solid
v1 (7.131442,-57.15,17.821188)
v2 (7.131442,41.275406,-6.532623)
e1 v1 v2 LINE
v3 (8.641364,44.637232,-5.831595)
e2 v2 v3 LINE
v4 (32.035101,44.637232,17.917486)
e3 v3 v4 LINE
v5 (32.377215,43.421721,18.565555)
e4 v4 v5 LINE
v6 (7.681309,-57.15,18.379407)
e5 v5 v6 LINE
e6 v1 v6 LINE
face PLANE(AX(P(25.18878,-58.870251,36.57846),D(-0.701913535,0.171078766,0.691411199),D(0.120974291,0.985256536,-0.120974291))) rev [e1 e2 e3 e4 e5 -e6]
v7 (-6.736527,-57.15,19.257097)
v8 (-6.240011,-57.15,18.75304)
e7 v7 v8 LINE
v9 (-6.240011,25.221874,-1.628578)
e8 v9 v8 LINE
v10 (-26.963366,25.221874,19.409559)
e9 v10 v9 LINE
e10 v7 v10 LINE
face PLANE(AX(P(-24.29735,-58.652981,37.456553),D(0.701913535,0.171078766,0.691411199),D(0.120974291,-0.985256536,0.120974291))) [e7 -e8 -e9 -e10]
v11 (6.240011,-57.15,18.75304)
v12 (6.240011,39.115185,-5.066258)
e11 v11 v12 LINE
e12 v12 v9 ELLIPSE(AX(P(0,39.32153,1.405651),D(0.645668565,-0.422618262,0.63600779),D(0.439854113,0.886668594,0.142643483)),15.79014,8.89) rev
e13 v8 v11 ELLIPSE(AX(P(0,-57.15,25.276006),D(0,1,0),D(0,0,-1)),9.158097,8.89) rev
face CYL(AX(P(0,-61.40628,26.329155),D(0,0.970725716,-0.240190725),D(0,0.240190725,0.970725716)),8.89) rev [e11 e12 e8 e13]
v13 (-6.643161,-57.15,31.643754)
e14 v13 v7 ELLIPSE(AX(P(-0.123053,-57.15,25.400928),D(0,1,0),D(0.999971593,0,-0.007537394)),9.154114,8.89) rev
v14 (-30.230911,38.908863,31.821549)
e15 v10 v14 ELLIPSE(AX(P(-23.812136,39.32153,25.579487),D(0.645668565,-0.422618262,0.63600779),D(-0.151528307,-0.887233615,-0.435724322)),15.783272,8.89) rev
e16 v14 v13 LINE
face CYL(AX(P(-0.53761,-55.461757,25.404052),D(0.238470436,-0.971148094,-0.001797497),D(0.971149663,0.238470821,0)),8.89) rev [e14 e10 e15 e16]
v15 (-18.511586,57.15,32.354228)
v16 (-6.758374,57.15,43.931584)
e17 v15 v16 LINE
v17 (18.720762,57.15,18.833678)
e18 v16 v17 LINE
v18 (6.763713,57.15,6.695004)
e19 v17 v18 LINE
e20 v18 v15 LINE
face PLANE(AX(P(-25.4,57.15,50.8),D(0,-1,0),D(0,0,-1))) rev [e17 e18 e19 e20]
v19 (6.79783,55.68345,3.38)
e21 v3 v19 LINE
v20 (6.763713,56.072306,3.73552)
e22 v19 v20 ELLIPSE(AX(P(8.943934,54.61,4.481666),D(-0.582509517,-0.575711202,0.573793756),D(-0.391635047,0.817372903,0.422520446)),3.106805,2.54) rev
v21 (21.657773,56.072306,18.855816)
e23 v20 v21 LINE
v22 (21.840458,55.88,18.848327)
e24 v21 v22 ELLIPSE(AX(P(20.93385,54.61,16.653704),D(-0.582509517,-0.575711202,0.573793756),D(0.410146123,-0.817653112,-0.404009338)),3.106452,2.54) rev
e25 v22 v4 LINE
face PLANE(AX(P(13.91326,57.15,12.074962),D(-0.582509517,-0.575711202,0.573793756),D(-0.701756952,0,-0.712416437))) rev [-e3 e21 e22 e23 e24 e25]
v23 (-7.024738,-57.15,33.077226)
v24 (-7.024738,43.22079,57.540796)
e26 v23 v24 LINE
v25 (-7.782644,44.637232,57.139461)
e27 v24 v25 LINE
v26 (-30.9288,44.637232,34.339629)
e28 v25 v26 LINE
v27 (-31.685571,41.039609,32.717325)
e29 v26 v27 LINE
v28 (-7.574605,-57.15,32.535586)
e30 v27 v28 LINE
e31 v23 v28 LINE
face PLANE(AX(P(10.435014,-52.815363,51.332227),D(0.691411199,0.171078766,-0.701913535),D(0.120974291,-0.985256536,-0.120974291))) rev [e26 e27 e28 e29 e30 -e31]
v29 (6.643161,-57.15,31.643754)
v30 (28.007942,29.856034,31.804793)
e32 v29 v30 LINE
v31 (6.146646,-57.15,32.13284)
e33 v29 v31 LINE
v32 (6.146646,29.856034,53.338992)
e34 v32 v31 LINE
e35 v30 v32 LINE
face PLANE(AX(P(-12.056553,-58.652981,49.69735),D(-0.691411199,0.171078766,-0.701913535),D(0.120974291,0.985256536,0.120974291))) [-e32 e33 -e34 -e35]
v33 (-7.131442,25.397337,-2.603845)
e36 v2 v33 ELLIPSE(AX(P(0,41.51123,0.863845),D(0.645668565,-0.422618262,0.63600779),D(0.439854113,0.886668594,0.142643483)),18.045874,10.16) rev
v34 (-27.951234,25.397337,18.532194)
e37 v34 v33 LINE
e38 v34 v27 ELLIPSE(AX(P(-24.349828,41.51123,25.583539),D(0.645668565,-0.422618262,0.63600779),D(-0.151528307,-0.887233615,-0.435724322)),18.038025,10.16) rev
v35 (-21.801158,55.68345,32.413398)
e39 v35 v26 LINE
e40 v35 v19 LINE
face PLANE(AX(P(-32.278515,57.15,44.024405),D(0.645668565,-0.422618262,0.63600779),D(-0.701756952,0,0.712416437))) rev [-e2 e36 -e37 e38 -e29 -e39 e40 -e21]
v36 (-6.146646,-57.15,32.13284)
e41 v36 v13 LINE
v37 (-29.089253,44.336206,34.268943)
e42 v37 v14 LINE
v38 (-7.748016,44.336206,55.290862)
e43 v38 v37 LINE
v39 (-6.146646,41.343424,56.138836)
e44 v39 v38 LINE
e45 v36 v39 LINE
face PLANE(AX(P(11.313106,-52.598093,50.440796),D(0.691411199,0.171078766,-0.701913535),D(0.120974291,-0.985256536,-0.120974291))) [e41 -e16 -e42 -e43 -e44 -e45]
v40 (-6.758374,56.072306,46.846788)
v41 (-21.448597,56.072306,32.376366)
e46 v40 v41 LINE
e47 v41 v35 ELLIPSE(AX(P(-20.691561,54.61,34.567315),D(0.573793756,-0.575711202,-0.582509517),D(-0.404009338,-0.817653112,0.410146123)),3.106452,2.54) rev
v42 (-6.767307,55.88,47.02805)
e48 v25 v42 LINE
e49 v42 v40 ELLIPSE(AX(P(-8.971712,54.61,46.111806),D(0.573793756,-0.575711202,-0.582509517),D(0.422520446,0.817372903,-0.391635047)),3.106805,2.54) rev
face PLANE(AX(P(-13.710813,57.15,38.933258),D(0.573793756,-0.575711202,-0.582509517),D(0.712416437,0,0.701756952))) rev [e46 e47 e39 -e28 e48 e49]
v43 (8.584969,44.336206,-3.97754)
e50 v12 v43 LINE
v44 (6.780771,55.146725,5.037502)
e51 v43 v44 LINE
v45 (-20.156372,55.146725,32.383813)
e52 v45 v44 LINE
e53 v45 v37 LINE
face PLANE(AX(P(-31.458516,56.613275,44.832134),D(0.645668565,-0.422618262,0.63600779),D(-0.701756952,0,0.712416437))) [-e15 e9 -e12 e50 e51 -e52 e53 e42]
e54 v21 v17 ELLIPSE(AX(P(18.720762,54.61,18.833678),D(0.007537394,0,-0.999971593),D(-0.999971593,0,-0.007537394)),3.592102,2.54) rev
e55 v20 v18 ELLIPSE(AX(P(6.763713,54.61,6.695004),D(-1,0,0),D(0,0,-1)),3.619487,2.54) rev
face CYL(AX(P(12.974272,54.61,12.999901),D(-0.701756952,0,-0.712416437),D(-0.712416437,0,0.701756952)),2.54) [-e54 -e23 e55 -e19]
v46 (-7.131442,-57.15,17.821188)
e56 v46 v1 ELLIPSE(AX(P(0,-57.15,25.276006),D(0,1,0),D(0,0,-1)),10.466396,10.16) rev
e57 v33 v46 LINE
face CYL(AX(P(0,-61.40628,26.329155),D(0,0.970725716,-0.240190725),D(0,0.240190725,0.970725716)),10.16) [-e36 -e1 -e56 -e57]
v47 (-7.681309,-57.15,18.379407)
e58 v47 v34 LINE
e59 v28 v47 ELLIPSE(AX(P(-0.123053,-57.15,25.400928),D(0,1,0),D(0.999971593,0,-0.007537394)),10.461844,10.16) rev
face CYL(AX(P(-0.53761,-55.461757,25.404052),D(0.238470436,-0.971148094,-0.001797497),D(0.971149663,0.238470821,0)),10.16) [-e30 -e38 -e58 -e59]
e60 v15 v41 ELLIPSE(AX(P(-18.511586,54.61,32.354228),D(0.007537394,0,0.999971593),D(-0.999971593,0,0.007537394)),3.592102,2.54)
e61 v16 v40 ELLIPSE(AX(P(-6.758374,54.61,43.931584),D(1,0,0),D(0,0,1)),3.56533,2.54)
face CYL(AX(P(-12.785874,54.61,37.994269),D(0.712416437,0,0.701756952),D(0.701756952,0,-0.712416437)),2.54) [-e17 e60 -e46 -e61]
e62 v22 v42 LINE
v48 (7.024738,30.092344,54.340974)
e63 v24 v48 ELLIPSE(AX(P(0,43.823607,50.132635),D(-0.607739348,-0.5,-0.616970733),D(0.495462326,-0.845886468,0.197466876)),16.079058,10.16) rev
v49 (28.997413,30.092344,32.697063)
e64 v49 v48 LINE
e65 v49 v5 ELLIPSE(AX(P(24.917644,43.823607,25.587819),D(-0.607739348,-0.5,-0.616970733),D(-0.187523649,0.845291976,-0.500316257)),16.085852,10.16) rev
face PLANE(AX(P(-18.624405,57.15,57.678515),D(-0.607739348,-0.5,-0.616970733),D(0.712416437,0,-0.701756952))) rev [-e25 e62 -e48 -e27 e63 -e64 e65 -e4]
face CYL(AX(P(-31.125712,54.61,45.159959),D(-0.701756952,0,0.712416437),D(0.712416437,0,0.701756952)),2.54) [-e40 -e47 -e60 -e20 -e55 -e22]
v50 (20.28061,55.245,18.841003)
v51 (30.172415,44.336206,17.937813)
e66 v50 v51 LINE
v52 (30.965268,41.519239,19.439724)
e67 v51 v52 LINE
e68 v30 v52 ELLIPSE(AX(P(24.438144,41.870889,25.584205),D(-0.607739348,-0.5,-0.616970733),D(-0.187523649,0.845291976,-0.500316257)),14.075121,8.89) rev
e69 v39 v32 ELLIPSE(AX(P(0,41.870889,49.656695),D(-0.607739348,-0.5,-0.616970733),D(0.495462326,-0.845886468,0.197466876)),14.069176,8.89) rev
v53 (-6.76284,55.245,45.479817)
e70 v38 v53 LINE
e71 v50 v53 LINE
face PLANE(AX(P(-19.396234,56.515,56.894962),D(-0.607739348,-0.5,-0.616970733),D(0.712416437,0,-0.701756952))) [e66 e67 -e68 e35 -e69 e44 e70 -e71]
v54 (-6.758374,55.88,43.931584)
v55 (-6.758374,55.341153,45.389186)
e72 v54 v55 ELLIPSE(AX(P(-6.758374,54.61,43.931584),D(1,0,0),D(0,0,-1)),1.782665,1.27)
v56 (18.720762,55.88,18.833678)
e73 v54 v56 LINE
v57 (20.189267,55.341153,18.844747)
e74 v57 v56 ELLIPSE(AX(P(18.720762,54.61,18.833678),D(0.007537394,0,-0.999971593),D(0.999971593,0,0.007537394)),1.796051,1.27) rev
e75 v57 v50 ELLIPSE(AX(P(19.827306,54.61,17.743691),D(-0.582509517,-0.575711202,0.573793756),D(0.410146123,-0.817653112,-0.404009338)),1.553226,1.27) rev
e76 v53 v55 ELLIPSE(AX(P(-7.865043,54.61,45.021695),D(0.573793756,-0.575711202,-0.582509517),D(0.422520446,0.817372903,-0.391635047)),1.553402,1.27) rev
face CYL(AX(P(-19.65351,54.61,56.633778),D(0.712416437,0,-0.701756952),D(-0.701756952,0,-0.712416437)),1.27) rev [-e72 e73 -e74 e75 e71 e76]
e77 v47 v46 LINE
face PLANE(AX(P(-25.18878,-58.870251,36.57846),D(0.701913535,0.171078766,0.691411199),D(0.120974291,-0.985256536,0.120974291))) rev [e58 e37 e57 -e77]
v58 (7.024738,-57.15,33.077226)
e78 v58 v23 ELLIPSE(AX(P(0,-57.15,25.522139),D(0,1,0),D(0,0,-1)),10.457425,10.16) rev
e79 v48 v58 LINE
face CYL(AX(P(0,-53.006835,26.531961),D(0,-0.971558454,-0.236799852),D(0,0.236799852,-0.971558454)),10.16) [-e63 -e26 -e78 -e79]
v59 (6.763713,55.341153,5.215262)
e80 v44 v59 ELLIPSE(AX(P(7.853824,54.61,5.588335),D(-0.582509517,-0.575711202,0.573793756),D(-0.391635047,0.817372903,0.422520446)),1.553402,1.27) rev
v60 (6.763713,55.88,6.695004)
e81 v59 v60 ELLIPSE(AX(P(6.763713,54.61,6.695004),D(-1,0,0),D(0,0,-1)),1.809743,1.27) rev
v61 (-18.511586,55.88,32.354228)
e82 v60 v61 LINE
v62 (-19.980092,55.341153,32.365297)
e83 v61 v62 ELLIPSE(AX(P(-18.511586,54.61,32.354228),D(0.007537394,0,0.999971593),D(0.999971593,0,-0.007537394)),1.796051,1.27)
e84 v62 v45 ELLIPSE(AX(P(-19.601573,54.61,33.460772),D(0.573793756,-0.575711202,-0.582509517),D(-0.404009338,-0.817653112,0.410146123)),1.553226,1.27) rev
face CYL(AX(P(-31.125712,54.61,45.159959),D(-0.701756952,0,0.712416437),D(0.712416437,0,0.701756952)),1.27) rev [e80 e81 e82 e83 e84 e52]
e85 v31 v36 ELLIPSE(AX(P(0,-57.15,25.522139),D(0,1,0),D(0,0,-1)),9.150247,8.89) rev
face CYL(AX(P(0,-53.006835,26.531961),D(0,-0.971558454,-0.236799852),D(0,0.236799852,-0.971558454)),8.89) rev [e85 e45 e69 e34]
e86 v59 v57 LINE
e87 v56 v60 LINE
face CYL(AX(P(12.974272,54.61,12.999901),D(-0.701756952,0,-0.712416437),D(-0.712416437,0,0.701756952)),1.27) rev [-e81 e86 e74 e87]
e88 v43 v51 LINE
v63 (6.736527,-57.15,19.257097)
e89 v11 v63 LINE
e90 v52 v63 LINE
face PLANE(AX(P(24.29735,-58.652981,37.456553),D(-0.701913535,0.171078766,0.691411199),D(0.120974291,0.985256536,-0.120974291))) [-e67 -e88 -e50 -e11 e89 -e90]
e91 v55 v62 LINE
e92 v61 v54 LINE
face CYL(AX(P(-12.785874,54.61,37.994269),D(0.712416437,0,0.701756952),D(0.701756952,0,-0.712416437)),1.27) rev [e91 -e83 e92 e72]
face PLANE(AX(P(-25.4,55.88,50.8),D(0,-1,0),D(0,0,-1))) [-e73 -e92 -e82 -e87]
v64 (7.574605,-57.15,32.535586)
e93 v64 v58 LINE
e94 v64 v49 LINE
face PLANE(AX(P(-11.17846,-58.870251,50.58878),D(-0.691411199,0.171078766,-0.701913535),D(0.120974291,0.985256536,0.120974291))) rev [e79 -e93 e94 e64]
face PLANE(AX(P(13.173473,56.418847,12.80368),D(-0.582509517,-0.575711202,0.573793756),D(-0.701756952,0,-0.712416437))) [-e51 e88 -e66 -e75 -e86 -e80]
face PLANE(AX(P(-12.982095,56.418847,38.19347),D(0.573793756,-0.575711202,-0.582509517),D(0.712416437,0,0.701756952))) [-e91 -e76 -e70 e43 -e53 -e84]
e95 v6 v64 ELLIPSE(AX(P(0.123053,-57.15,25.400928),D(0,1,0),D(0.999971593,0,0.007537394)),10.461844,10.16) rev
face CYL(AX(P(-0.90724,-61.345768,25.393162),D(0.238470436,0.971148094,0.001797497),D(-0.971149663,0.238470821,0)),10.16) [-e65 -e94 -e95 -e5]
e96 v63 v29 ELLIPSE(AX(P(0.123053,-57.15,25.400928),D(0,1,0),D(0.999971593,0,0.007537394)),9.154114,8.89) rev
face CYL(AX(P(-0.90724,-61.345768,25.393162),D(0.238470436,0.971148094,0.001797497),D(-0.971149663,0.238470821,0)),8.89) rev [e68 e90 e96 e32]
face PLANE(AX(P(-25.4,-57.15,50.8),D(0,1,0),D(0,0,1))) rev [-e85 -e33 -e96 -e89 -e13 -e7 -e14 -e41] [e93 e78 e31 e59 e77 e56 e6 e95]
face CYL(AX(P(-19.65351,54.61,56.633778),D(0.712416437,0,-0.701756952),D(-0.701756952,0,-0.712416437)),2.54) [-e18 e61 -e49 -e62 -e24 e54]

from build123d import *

# Parameters (mm, degrees)
SKETCH3_W           = 50.8
SKETCH3_H           = 114.3
BOSS_EXTRUDE5_DEPTH = 50.8
DRAFT2_ANGLE        = 7
CHAMFER22_SIZE      = 35.56
CHAMFER22_SIZE_2    = 36.100146123
CHAMFER26_SIZE      = 12.7
CHAMFER26_SIZE_2    = 10.982965741
CHAMFER27_SIZE      = 27.462526176
CHAMFER27_SIZE_2    = 20.32
CHAMFER28_SIZE      = 32.227786218
CHAMFER28_SIZE_2    = 20.32
FILLET36_R          = 2.54
FILLET41_R          = 10.16
SHELL2_T            = -1.27


with BuildPart() as part:
    # Sketch3 → Boss-Extrude5 (new body)
    with BuildSketch(Plane.XY):
        Rectangle(SKETCH3_W, SKETCH3_H)
    extrude(amount=BOSS_EXTRUDE5_DEPTH)

    # Draft2
    draft2_faces = [part.faces().sort_by_distance(p)[0] for p in [
        (0, 0, 50.8),
        (25.4, 0, 25.4),
        (0, 0, 0),
        (-25.4, 0, 25.4),
    ]]
    draft(draft2_faces, Plane(origin=(-25.4, -57.15, 50.8), x_dir=(0, 0, -1), z_dir=(0, -1, 0)), DRAFT2_ANGLE)

    # Chamfer22
    # the kernel refuses this chamfer: 36.100146123, 35.56 mm, written as the material it takes off along each edge
    with BuildSketch(Plane(origin=(14.164548215, -148.655411614, 39.564548215), x_dir=(0.04243090311992196, 0.11662547522410431, -0.9922691756721962), z_dir=(0.1209742911513545, 0.9852565360152932, 0.1209742911513545)), Plane(origin=(-50.669727097, 148.655411614, 76.069727097), x_dir=(-0.04243090311992182, 0.11662547522410434, -0.9922691756721962), z_dir=(0.1209742911513545, -0.9852565360152932, -0.1209742911513545))) as chamfer22_piece_1:
        Polygon((CHAMFER22_SIZE * 0.999610675702, CHAMFER22_SIZE * 0.0279015595125), (-CHAMFER22_SIZE_2 * 0.0427448365612, CHAMFER22_SIZE_2 * 0.999086021807), (0, 0), align=None)
    extrude(amount=301.759808092, mode=Mode.SUBTRACT)
    with BuildSketch(Plane(origin=(14.164548215, -148.655411614, 11.235451785), x_dir=(0.04160965436003197, 0.11672908614577471, 0.9922917701521116), z_dir=(0.1209742911513545, 0.9852565360152932, -0.1209742911513545)), Plane(origin=(-50.669727097, 148.655411614, -25.269727097), x_dir=(-0.04160965436003206, 0.11672908614577471, 0.9922917701521116), z_dir=(0.1209742911513545, -0.9852565360152932, 0.1209742911513545))) as chamfer22_piece_2:
        Polygon((CHAMFER22_SIZE_2 * 0.999633437363, -CHAMFER22_SIZE_2 * 0.0270738052216), (-CHAMFER22_SIZE * 0.0419175116292, -CHAMFER22_SIZE * 0.999121074855), (0, 0), align=None)
    extrude(amount=301.759808092, mode=Mode.SUBTRACT)

    # Chamfer26
    # the kernel refuses this chamfer: 12.7, 10.982965741 mm, written as the material it takes off along each edge
    with BuildSketch(Plane(origin=(62.353919786, 57.15, 45.600752144), x_dir=(-0.10253351623411874, -0.9895888066791988, 0.10099936506685082), z_dir=(-0.7017569520656596, 0, -0.7124164373647731))) as chamfer26_piece_1:
        Polygon((CHAMFER26_SIZE * 0.999621916911, CHAMFER26_SIZE * 0.0274958766106), (CHAMFER26_SIZE_2 * 0.14392356894, CHAMFER26_SIZE_2 * 0.989588806705), (0, 0), align=None)
    extrude(amount=116.368475455, mode=Mode.SUBTRACT)
    with BuildSketch(Plane(origin=(20.200752144, 57.15, 87.753919786), x_dir=(0.10099936506686123, -0.9895888066791988, -0.10253351623410831), z_dir=(-0.7124164373647012, 0, -0.7017569520657325))) as chamfer26_piece_2:
        Polygon((CHAMFER26_SIZE * 0.999621916911, -CHAMFER26_SIZE * 0.0274958766106), (CHAMFER26_SIZE_2 * 0.14392356894, -CHAMFER26_SIZE_2 * 0.989588806705), (0, 0), align=None)
    extrude(amount=116.368475455, mode=Mode.SUBTRACT)

    # Chamfer27
    # the kernel refuses this chamfer: 27.462526176, 20.32 mm, written as the material it takes off along each edge
    with BuildSketch(Plane(origin=(85.378052857, 57.15, -16.24516911), x_dir=(-0.10283002660704509, -0.9892058931774511, -0.10439198499403901), z_dir=(-0.7124164373647012, 0, 0.7017569520657325))) as chamfer27_piece_1:
        Polygon((CHAMFER27_SIZE * 0.999690938869, -CHAMFER27_SIZE * 0.0248601439751), (CHAMFER27_SIZE_2 * 0.146532252091, -CHAMFER27_SIZE_2 * 0.989205893177), (0, 0), align=None)
    extrude(amount=179.645229373, mode=Mode.SUBTRACT)

    # Chamfer28
    # the kernel refuses this chamfer: 32.227786218, 20.32 mm, written as the material it takes off along each edge
    with BuildSketch(Plane(origin=(50.702210768, 57.15, -69.17266836), x_dir=(0.10631921382033309, -0.9888013870052722, 0.10472841939548341), z_dir=(-0.7017569520656596, 0, 0.7124164373647731))) as chamfer28_piece_1:
        Polygon((CHAMFER28_SIZE * 0.999755198418, CHAMFER28_SIZE * 0.0221256235269), (CHAMFER28_SIZE_2 * 0.149237451923, CHAMFER28_SIZE_2 * 0.988801387005), (0, 0), align=None)
    extrude(amount=205.453325716, mode=Mode.SUBTRACT)

    # Fillet36
    fillet36_edges = [part.edges().sort_by_distance(p)[0] for p in [
        (13.620964483, 57.15, 11.778226285),
        (7.018121545, 57.15, 32.419663344),
        (-13.620970138, 57.15, 39.021756036),
        (-7.0181272, 57.15, 18.380318978),
    ]]
    fillet(fillet36_edges, radius=FILLET36_R)

    # Fillet41
    fillet41_edges = [part.edges().sort_by_distance(p)[0] for p in [
        (0, -13.528827954, 50.628730432),
        (0, -15.876331706, 0.368905118),
        (25.400607617, -13.597419467, 25.591459835),
        (-24.841008934, -15.876331706, 25.587241799),
    ]]
    fillet(fillet41_edges, radius=FILLET41_R)

    # Shell2
    shell2_openings = [part.faces().sort_by_distance(p)[0] for p in [
        (0, -57.15, 25.396792281),
    ]]
    offset(amount=SHELL2_T, openings=shell2_openings)


solid = part.part
